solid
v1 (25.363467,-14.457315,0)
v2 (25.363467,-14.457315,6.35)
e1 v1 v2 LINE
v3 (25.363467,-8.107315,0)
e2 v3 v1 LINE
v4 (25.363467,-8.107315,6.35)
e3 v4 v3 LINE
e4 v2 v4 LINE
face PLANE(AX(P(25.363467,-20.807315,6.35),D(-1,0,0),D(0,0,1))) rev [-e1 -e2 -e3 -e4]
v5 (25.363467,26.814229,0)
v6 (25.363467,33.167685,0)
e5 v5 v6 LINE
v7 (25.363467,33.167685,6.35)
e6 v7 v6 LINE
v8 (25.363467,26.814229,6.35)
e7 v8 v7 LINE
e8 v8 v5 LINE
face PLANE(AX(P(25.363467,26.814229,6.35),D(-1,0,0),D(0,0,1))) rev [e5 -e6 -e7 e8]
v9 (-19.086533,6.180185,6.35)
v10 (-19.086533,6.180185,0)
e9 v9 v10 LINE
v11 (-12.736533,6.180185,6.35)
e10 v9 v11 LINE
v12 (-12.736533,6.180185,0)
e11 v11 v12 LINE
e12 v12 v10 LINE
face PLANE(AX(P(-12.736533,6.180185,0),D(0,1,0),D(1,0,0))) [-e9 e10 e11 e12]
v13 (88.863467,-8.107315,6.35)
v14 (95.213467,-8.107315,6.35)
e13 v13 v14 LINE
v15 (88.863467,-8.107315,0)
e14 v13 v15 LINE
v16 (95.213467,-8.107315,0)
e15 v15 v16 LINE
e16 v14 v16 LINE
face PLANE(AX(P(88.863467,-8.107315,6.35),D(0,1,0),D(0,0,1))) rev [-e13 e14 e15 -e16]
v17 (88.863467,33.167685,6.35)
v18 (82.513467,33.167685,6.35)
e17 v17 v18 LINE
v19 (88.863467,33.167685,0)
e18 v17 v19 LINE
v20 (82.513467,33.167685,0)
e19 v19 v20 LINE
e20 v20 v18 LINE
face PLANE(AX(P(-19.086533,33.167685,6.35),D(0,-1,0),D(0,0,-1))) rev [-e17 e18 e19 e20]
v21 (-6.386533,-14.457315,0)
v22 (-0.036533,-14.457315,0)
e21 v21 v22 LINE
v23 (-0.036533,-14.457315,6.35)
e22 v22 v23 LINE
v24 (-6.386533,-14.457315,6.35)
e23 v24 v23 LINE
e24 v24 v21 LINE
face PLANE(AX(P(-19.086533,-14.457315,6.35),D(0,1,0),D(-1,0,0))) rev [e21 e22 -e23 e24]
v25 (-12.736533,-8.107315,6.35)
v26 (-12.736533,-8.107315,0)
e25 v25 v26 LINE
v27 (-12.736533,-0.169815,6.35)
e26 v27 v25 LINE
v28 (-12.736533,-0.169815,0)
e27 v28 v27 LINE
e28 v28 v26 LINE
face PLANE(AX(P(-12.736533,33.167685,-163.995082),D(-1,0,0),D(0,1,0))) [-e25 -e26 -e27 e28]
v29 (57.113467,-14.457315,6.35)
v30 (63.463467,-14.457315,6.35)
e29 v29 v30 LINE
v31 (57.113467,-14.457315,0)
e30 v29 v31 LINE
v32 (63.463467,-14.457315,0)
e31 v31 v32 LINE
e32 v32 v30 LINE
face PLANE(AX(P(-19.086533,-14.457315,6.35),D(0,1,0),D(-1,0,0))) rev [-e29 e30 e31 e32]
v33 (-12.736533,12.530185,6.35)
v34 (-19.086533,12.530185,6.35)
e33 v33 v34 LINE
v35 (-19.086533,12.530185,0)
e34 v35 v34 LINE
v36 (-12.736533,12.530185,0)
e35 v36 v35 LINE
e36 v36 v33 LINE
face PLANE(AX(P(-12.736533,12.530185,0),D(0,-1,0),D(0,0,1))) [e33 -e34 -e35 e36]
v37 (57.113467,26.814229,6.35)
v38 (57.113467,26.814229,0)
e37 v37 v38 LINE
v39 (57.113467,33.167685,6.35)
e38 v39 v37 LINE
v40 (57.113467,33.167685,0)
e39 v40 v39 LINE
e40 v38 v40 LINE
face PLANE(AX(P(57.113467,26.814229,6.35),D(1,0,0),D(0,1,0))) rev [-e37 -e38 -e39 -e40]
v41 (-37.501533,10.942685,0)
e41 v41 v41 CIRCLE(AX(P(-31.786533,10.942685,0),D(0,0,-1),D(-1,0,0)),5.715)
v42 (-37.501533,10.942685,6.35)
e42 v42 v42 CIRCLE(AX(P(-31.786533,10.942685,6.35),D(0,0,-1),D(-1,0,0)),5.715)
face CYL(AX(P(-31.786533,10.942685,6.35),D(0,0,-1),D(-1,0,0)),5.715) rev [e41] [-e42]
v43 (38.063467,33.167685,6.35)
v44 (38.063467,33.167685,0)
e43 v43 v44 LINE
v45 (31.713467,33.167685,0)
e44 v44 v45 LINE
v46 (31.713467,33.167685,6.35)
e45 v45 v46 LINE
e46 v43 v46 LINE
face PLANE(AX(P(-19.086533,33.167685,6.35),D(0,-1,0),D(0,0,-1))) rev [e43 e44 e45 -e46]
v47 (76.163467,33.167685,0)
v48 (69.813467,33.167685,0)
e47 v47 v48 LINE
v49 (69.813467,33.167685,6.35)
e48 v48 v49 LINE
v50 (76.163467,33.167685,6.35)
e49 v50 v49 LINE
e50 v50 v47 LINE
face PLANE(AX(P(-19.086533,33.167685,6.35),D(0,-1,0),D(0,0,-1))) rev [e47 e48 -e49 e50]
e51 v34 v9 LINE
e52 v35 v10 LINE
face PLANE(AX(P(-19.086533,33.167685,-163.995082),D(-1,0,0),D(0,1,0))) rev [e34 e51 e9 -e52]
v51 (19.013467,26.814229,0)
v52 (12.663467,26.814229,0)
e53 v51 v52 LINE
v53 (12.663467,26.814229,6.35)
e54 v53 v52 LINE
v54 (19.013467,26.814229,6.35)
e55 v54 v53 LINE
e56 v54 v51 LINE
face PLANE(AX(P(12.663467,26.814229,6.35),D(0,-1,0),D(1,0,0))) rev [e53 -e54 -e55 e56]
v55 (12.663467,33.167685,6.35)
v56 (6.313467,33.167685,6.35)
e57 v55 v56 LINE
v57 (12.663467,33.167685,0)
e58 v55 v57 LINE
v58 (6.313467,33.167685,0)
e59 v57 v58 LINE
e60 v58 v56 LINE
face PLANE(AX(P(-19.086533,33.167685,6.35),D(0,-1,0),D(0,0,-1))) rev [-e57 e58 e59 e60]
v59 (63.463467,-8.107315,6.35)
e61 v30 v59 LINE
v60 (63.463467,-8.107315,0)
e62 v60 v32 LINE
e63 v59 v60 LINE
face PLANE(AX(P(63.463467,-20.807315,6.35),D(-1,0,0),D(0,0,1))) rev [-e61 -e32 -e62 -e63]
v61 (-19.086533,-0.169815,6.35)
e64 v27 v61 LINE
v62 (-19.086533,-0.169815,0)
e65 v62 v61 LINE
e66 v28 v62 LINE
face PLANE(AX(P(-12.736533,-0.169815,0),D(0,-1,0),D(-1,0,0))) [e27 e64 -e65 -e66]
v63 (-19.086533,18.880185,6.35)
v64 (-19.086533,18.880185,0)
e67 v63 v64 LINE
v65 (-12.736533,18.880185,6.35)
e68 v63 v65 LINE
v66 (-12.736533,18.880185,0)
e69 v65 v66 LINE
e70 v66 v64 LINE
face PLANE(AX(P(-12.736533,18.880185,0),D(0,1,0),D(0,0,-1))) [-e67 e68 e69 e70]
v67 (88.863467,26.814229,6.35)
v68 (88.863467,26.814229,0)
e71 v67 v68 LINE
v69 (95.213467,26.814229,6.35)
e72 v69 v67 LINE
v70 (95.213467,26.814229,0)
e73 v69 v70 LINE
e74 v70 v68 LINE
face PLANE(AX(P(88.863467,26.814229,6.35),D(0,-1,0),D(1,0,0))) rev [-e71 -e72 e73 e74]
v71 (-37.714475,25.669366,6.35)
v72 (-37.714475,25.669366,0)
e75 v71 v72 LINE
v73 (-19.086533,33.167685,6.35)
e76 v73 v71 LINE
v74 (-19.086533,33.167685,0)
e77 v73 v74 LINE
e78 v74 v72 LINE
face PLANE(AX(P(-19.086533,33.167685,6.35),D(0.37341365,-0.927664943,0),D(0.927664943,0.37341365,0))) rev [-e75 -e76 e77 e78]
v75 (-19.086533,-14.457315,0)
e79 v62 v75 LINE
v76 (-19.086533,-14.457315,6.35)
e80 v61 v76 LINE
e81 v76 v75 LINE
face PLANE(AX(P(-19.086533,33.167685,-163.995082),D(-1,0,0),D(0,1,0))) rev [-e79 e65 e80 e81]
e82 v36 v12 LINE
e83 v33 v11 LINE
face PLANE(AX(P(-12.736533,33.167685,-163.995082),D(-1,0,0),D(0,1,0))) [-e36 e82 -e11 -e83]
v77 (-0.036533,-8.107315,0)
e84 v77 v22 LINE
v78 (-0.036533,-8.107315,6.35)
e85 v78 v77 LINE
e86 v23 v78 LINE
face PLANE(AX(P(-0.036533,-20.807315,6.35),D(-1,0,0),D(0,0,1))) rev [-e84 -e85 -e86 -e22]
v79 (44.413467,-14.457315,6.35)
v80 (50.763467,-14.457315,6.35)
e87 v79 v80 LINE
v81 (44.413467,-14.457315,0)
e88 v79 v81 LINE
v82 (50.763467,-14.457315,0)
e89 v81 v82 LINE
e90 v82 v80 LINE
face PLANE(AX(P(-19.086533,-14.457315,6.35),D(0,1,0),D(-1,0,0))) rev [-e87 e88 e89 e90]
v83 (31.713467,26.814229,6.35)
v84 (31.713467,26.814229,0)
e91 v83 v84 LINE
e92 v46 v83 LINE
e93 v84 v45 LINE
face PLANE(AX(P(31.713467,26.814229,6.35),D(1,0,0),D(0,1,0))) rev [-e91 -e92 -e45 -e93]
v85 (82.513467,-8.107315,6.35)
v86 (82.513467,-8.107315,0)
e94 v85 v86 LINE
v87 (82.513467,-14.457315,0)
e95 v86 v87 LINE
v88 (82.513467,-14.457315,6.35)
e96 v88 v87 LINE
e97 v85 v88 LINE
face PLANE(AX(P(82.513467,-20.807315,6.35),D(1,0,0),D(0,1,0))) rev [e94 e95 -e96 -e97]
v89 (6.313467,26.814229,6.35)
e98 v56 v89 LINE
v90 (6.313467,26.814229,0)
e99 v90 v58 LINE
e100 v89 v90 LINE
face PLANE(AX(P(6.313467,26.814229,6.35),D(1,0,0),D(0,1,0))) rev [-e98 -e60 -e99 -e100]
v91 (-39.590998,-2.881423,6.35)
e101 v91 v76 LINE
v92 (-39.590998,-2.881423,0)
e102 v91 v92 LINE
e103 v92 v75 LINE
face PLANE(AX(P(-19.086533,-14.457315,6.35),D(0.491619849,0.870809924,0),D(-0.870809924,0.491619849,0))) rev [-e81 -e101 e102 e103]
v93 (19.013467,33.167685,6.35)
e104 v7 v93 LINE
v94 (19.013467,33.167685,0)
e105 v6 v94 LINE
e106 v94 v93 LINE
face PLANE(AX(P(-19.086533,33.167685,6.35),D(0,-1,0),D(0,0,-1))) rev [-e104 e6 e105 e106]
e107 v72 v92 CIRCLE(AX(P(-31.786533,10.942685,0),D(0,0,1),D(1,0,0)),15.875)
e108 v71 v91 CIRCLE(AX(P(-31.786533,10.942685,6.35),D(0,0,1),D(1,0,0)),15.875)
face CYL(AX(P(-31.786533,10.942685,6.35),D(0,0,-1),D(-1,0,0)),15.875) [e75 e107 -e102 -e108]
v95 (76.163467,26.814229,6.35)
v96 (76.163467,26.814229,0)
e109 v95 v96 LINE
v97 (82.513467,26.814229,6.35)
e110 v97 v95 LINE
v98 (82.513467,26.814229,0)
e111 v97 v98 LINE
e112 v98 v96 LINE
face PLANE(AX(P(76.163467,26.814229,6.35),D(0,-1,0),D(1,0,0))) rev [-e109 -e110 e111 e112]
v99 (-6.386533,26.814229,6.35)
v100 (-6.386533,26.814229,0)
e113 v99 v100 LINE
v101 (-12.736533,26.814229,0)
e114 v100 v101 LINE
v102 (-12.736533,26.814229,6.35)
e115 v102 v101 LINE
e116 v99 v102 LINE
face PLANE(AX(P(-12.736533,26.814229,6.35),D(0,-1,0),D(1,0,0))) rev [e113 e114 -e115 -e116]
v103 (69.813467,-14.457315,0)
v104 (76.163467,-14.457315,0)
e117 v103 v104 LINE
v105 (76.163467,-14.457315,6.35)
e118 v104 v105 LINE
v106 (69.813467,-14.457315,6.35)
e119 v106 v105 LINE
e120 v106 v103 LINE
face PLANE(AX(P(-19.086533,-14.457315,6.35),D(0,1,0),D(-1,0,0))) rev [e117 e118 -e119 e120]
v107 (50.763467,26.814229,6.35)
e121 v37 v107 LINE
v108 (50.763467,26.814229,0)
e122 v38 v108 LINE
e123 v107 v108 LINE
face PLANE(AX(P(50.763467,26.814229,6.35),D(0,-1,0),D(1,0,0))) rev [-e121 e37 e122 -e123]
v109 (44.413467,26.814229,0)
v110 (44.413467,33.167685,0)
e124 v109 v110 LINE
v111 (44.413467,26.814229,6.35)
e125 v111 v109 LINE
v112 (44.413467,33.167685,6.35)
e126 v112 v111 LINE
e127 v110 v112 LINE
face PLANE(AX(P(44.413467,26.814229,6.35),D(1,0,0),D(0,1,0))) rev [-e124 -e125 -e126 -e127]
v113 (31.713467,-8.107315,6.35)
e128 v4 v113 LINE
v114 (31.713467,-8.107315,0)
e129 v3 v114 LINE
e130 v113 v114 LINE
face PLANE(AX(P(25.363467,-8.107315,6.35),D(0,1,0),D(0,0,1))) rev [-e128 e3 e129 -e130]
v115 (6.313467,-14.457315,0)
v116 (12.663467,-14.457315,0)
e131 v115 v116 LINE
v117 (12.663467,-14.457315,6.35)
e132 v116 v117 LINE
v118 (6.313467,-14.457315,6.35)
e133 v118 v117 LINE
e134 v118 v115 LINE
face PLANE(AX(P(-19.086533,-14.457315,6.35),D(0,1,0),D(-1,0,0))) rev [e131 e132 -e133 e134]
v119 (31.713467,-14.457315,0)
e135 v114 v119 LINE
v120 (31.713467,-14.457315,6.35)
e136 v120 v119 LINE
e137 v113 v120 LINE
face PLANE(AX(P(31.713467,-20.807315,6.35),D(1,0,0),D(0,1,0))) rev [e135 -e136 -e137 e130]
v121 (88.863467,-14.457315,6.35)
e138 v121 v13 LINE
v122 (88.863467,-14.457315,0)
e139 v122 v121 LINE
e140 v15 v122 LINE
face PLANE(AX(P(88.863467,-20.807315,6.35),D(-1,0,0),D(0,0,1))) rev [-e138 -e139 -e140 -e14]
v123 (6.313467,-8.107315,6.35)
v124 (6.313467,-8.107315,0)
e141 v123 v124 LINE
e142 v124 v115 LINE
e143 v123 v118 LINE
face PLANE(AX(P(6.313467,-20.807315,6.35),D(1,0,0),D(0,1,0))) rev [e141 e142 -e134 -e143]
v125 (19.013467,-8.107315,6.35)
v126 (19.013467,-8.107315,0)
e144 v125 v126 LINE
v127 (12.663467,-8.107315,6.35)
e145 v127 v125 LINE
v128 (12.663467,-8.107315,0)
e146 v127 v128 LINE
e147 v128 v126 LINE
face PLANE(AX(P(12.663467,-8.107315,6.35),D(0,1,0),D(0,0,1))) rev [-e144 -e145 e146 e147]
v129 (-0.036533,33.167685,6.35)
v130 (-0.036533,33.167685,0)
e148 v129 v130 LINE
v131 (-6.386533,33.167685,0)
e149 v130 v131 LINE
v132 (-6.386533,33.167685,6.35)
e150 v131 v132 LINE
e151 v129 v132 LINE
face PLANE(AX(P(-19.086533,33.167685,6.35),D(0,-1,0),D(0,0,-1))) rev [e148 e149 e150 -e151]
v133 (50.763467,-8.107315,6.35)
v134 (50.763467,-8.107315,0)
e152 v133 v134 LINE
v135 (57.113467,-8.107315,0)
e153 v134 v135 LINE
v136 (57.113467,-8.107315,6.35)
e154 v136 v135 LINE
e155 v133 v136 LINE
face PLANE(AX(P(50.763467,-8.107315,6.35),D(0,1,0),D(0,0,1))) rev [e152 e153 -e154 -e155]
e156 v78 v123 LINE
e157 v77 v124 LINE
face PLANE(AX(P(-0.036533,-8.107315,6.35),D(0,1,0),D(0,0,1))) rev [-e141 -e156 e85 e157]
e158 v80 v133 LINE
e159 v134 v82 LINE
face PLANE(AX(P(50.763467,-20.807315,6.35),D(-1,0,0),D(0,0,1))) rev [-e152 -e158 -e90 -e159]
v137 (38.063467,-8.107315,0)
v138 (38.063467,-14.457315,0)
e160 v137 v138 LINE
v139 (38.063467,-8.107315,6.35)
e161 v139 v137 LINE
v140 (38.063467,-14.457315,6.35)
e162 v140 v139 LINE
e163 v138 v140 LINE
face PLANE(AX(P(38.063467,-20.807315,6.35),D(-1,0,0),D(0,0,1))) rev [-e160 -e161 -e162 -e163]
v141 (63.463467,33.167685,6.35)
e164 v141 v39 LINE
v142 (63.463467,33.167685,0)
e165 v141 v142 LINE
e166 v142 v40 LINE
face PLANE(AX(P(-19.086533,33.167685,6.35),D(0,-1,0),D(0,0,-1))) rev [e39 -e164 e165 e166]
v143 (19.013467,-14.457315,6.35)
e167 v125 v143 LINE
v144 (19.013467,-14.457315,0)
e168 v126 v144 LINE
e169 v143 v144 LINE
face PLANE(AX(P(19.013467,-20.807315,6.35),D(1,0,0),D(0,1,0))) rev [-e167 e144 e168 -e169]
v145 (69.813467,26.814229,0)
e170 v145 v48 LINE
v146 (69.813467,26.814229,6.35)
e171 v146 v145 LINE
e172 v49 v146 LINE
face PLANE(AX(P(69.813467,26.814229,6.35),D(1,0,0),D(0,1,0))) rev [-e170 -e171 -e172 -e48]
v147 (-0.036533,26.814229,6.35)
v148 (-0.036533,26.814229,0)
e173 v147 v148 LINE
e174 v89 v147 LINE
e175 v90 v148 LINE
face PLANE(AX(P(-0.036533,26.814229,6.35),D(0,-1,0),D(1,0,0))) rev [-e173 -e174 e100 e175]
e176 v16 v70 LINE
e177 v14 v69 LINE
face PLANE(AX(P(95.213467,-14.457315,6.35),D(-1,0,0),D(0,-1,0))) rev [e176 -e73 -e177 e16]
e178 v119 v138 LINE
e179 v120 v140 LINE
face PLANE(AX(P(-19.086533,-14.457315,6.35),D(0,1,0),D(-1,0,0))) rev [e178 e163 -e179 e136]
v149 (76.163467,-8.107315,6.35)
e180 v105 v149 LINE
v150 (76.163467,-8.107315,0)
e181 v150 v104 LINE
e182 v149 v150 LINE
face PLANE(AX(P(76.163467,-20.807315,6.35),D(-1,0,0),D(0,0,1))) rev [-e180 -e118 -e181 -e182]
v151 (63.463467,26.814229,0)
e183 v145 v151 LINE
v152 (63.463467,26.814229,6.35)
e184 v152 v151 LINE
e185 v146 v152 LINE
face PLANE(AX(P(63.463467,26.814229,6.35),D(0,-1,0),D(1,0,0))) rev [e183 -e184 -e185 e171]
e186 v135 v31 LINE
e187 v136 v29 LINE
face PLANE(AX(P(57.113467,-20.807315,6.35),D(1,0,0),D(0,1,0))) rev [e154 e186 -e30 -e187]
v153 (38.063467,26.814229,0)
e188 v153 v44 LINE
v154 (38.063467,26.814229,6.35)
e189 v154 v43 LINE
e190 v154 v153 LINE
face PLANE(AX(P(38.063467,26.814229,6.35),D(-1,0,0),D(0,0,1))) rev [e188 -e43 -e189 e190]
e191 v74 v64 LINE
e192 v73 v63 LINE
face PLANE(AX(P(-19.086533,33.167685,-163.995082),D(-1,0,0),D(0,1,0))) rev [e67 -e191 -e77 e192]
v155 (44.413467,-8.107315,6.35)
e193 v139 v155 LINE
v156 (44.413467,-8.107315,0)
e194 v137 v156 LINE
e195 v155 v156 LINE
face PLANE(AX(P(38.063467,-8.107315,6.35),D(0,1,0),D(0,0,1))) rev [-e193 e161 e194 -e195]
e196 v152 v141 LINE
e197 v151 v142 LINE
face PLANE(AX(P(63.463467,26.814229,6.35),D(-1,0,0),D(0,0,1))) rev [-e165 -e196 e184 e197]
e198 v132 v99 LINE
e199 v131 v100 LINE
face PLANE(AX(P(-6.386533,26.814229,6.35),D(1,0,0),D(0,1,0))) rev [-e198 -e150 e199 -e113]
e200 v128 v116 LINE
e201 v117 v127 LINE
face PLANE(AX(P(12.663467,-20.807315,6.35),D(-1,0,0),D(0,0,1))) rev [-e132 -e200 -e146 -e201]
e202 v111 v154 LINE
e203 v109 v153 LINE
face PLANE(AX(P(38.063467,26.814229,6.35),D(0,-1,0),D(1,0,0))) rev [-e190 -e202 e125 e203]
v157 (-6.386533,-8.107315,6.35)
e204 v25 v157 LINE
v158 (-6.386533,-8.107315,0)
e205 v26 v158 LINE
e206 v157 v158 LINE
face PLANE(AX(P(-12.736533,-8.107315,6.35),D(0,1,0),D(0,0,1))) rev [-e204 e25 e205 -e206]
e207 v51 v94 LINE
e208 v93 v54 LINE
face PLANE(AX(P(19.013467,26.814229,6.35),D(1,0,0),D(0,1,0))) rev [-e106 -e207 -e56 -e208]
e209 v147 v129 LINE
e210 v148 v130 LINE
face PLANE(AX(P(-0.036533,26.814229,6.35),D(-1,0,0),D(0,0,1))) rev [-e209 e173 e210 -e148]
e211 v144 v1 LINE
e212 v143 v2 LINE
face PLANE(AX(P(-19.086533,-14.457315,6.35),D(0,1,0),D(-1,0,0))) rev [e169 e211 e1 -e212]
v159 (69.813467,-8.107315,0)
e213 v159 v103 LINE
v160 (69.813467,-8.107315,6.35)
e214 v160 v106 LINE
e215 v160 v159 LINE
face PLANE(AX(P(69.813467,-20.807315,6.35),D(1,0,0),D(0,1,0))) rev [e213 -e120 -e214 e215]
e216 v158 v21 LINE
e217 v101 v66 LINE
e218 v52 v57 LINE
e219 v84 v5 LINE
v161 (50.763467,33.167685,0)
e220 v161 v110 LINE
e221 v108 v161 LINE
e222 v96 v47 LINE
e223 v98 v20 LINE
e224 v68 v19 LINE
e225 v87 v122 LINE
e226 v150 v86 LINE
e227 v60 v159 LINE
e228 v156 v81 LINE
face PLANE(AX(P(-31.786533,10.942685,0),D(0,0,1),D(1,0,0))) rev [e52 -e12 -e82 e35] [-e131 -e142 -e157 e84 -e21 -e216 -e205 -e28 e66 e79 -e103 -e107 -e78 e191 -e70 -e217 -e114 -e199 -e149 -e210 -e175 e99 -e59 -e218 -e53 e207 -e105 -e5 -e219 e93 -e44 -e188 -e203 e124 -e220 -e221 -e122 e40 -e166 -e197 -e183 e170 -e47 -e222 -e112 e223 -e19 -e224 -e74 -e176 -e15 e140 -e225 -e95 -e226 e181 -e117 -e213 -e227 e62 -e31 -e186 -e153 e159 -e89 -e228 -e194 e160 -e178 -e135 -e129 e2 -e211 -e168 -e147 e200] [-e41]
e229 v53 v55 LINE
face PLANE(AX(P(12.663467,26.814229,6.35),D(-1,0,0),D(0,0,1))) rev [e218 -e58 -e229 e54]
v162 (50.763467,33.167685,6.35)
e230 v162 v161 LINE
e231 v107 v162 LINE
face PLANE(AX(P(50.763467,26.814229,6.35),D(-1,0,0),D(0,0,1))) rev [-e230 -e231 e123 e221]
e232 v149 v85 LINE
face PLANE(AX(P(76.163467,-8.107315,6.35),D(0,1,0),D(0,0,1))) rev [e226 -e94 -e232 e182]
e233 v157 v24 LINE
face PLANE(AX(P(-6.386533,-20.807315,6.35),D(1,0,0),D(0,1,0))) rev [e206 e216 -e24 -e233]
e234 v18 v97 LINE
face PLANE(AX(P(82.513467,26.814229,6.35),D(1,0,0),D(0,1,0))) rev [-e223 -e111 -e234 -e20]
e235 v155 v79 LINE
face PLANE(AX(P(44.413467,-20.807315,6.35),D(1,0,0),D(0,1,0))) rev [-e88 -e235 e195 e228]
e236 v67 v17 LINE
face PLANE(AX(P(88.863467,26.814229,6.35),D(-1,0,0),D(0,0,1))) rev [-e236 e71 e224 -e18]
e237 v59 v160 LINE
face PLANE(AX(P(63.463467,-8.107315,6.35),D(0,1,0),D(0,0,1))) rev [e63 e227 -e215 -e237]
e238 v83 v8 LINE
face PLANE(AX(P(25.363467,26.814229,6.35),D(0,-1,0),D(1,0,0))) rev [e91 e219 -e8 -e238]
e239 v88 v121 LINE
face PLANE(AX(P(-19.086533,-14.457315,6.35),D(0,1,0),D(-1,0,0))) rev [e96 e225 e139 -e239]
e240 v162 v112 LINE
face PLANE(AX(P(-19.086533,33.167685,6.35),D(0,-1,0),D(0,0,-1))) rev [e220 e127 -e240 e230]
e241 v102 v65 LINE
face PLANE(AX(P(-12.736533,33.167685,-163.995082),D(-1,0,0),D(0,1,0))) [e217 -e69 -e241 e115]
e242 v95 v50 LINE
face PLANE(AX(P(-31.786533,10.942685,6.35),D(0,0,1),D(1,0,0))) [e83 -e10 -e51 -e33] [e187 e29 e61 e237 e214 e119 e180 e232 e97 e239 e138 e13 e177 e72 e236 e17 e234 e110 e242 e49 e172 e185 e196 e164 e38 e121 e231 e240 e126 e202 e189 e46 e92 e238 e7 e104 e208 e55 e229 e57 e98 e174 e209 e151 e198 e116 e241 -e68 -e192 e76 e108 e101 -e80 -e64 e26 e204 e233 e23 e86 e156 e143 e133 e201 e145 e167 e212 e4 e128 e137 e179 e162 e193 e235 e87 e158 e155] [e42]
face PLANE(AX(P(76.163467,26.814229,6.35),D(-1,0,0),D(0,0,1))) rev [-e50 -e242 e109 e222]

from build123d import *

# Parameters (mm, degrees)
MASS_DEPTH          = 6.35
SKETCH4_R           = 5.715
CUT_EXTRUDE1_DEPTH  = 102.024858757
SKETCH3_W           = 6.35
SKETCH3_H           = 12.7
CUT_EXTRUDE2_DEPTH  = 102.024858757
CAVITY1_START       = -14.457315323
CAVITY1_OUTLINE_W   = 6.35
CAVITY1_OUTLINE_H   = 6.35
CAVITY1_DEPTH       = 14.2875
CAVITY1_START_2     = 18.880184677
CAVITY1_2_OUTLINE_W = 6.35
CAVITY1_2_OUTLINE_H = 6.35
CAVITY1_2_DEPTH     = 14.2875
CAVITY1_START_3     = 6.180184677
CAVITY1_3_OUTLINE_W = 6.35
CAVITY1_3_OUTLINE_H = 6.35
CAVITY1_3_DEPTH     = 6.35
LPATTERN1_COUNT     = 9
LPATTERN1_PITCH     = 12.7


# Read off the part's stored shape, not the designer's step: Cavity1
with BuildPart() as part:
    # Sketch1 → Mass (new body)
    with BuildSketch(Plane.XY):
        with BuildLine():
            Line((-19.086533096, -14.457315323), (95.213466904, -14.457315323))
            Line((95.213466904, -14.457315323), (95.213466904, 33.167684677))
            Line((95.213466904, 33.167684677), (-19.086533096, 33.167684677))
            Line((-19.086533096, 33.167684677), (-37.714474787, 25.669365644))
            ThreePointArc((-37.714474787, 25.669365644), (-47.627354737, 11.983835347), (-39.590998194, -2.881422872))
            Line((-39.590998194, -2.881422872), (-19.086533096, -14.457315323))
        make_face()
    extrude(amount=MASS_DEPTH)

    # Sketch4 → Cut-Extrude1 (cut, through all)
    with BuildSketch(Plane(origin=(0, 0, 0), x_dir=(-1, 0, 0), z_dir=(0, 0, -1))):
        with Locations((31.786533096, 10.942684677)):
            Circle(SKETCH4_R)
    extrude(amount=-CUT_EXTRUDE1_DEPTH, mode=Mode.SUBTRACT)

    # Sketch3 → Cut-Extrude2 (cut, through all)
    with BuildSketch(Plane(origin=(0, 0, 0), x_dir=(-1, 0, 0), z_dir=(0, 0, -1))):
        with Locations((-92.038466904, 33.164228805)):
            Rectangle(SKETCH3_W, SKETCH3_H)
        with Locations((-92.038466904, -14.457315323)):
            Rectangle(SKETCH3_W, SKETCH3_H)
    cut_extrude2 = extrude(amount=-CUT_EXTRUDE2_DEPTH, mode=Mode.SUBTRACT)

    # Cavity1 outline → Cavity1 (cut)
    with BuildSketch(Plane(origin=(0, 0, 0), x_dir=(1, 0, 0), z_dir=(0, 1, 0)).offset(CAVITY1_START)):
        with Locations((-15.911533096, -3.175)):
            Rectangle(CAVITY1_OUTLINE_W, CAVITY1_OUTLINE_H)
    extrude(amount=CAVITY1_DEPTH, mode=Mode.SUBTRACT)

    # Cavity1 2 outline → Cavity1 2 (cut)
    with BuildSketch(Plane(origin=(0, 0, 0), x_dir=(1, 0, 0), z_dir=(0, 1, 0)).offset(CAVITY1_START_2)):
        with Locations((-15.911533096, -3.175)):
            Rectangle(CAVITY1_2_OUTLINE_W, CAVITY1_2_OUTLINE_H)
    extrude(amount=CAVITY1_2_DEPTH, mode=Mode.SUBTRACT)

    # Cavity1 3 outline → Cavity1 3 (cut)
    with BuildSketch(Plane(origin=(0, 0, 0), x_dir=(1, 0, 0), z_dir=(0, 1, 0)).offset(CAVITY1_START_3)):
        with Locations((-15.911533096, -3.175)):
            Rectangle(CAVITY1_3_OUTLINE_W, CAVITY1_3_OUTLINE_H)
    extrude(amount=CAVITY1_3_DEPTH, mode=Mode.SUBTRACT)

    # LPattern1: Cut-Extrude2 ×9
    with Locations(*[(-i * LPATTERN1_PITCH, 0, 0) for i in range(1, LPATTERN1_COUNT)]):
        add(cut_extrude2, mode=Mode.SUBTRACT)


solid = part.part
